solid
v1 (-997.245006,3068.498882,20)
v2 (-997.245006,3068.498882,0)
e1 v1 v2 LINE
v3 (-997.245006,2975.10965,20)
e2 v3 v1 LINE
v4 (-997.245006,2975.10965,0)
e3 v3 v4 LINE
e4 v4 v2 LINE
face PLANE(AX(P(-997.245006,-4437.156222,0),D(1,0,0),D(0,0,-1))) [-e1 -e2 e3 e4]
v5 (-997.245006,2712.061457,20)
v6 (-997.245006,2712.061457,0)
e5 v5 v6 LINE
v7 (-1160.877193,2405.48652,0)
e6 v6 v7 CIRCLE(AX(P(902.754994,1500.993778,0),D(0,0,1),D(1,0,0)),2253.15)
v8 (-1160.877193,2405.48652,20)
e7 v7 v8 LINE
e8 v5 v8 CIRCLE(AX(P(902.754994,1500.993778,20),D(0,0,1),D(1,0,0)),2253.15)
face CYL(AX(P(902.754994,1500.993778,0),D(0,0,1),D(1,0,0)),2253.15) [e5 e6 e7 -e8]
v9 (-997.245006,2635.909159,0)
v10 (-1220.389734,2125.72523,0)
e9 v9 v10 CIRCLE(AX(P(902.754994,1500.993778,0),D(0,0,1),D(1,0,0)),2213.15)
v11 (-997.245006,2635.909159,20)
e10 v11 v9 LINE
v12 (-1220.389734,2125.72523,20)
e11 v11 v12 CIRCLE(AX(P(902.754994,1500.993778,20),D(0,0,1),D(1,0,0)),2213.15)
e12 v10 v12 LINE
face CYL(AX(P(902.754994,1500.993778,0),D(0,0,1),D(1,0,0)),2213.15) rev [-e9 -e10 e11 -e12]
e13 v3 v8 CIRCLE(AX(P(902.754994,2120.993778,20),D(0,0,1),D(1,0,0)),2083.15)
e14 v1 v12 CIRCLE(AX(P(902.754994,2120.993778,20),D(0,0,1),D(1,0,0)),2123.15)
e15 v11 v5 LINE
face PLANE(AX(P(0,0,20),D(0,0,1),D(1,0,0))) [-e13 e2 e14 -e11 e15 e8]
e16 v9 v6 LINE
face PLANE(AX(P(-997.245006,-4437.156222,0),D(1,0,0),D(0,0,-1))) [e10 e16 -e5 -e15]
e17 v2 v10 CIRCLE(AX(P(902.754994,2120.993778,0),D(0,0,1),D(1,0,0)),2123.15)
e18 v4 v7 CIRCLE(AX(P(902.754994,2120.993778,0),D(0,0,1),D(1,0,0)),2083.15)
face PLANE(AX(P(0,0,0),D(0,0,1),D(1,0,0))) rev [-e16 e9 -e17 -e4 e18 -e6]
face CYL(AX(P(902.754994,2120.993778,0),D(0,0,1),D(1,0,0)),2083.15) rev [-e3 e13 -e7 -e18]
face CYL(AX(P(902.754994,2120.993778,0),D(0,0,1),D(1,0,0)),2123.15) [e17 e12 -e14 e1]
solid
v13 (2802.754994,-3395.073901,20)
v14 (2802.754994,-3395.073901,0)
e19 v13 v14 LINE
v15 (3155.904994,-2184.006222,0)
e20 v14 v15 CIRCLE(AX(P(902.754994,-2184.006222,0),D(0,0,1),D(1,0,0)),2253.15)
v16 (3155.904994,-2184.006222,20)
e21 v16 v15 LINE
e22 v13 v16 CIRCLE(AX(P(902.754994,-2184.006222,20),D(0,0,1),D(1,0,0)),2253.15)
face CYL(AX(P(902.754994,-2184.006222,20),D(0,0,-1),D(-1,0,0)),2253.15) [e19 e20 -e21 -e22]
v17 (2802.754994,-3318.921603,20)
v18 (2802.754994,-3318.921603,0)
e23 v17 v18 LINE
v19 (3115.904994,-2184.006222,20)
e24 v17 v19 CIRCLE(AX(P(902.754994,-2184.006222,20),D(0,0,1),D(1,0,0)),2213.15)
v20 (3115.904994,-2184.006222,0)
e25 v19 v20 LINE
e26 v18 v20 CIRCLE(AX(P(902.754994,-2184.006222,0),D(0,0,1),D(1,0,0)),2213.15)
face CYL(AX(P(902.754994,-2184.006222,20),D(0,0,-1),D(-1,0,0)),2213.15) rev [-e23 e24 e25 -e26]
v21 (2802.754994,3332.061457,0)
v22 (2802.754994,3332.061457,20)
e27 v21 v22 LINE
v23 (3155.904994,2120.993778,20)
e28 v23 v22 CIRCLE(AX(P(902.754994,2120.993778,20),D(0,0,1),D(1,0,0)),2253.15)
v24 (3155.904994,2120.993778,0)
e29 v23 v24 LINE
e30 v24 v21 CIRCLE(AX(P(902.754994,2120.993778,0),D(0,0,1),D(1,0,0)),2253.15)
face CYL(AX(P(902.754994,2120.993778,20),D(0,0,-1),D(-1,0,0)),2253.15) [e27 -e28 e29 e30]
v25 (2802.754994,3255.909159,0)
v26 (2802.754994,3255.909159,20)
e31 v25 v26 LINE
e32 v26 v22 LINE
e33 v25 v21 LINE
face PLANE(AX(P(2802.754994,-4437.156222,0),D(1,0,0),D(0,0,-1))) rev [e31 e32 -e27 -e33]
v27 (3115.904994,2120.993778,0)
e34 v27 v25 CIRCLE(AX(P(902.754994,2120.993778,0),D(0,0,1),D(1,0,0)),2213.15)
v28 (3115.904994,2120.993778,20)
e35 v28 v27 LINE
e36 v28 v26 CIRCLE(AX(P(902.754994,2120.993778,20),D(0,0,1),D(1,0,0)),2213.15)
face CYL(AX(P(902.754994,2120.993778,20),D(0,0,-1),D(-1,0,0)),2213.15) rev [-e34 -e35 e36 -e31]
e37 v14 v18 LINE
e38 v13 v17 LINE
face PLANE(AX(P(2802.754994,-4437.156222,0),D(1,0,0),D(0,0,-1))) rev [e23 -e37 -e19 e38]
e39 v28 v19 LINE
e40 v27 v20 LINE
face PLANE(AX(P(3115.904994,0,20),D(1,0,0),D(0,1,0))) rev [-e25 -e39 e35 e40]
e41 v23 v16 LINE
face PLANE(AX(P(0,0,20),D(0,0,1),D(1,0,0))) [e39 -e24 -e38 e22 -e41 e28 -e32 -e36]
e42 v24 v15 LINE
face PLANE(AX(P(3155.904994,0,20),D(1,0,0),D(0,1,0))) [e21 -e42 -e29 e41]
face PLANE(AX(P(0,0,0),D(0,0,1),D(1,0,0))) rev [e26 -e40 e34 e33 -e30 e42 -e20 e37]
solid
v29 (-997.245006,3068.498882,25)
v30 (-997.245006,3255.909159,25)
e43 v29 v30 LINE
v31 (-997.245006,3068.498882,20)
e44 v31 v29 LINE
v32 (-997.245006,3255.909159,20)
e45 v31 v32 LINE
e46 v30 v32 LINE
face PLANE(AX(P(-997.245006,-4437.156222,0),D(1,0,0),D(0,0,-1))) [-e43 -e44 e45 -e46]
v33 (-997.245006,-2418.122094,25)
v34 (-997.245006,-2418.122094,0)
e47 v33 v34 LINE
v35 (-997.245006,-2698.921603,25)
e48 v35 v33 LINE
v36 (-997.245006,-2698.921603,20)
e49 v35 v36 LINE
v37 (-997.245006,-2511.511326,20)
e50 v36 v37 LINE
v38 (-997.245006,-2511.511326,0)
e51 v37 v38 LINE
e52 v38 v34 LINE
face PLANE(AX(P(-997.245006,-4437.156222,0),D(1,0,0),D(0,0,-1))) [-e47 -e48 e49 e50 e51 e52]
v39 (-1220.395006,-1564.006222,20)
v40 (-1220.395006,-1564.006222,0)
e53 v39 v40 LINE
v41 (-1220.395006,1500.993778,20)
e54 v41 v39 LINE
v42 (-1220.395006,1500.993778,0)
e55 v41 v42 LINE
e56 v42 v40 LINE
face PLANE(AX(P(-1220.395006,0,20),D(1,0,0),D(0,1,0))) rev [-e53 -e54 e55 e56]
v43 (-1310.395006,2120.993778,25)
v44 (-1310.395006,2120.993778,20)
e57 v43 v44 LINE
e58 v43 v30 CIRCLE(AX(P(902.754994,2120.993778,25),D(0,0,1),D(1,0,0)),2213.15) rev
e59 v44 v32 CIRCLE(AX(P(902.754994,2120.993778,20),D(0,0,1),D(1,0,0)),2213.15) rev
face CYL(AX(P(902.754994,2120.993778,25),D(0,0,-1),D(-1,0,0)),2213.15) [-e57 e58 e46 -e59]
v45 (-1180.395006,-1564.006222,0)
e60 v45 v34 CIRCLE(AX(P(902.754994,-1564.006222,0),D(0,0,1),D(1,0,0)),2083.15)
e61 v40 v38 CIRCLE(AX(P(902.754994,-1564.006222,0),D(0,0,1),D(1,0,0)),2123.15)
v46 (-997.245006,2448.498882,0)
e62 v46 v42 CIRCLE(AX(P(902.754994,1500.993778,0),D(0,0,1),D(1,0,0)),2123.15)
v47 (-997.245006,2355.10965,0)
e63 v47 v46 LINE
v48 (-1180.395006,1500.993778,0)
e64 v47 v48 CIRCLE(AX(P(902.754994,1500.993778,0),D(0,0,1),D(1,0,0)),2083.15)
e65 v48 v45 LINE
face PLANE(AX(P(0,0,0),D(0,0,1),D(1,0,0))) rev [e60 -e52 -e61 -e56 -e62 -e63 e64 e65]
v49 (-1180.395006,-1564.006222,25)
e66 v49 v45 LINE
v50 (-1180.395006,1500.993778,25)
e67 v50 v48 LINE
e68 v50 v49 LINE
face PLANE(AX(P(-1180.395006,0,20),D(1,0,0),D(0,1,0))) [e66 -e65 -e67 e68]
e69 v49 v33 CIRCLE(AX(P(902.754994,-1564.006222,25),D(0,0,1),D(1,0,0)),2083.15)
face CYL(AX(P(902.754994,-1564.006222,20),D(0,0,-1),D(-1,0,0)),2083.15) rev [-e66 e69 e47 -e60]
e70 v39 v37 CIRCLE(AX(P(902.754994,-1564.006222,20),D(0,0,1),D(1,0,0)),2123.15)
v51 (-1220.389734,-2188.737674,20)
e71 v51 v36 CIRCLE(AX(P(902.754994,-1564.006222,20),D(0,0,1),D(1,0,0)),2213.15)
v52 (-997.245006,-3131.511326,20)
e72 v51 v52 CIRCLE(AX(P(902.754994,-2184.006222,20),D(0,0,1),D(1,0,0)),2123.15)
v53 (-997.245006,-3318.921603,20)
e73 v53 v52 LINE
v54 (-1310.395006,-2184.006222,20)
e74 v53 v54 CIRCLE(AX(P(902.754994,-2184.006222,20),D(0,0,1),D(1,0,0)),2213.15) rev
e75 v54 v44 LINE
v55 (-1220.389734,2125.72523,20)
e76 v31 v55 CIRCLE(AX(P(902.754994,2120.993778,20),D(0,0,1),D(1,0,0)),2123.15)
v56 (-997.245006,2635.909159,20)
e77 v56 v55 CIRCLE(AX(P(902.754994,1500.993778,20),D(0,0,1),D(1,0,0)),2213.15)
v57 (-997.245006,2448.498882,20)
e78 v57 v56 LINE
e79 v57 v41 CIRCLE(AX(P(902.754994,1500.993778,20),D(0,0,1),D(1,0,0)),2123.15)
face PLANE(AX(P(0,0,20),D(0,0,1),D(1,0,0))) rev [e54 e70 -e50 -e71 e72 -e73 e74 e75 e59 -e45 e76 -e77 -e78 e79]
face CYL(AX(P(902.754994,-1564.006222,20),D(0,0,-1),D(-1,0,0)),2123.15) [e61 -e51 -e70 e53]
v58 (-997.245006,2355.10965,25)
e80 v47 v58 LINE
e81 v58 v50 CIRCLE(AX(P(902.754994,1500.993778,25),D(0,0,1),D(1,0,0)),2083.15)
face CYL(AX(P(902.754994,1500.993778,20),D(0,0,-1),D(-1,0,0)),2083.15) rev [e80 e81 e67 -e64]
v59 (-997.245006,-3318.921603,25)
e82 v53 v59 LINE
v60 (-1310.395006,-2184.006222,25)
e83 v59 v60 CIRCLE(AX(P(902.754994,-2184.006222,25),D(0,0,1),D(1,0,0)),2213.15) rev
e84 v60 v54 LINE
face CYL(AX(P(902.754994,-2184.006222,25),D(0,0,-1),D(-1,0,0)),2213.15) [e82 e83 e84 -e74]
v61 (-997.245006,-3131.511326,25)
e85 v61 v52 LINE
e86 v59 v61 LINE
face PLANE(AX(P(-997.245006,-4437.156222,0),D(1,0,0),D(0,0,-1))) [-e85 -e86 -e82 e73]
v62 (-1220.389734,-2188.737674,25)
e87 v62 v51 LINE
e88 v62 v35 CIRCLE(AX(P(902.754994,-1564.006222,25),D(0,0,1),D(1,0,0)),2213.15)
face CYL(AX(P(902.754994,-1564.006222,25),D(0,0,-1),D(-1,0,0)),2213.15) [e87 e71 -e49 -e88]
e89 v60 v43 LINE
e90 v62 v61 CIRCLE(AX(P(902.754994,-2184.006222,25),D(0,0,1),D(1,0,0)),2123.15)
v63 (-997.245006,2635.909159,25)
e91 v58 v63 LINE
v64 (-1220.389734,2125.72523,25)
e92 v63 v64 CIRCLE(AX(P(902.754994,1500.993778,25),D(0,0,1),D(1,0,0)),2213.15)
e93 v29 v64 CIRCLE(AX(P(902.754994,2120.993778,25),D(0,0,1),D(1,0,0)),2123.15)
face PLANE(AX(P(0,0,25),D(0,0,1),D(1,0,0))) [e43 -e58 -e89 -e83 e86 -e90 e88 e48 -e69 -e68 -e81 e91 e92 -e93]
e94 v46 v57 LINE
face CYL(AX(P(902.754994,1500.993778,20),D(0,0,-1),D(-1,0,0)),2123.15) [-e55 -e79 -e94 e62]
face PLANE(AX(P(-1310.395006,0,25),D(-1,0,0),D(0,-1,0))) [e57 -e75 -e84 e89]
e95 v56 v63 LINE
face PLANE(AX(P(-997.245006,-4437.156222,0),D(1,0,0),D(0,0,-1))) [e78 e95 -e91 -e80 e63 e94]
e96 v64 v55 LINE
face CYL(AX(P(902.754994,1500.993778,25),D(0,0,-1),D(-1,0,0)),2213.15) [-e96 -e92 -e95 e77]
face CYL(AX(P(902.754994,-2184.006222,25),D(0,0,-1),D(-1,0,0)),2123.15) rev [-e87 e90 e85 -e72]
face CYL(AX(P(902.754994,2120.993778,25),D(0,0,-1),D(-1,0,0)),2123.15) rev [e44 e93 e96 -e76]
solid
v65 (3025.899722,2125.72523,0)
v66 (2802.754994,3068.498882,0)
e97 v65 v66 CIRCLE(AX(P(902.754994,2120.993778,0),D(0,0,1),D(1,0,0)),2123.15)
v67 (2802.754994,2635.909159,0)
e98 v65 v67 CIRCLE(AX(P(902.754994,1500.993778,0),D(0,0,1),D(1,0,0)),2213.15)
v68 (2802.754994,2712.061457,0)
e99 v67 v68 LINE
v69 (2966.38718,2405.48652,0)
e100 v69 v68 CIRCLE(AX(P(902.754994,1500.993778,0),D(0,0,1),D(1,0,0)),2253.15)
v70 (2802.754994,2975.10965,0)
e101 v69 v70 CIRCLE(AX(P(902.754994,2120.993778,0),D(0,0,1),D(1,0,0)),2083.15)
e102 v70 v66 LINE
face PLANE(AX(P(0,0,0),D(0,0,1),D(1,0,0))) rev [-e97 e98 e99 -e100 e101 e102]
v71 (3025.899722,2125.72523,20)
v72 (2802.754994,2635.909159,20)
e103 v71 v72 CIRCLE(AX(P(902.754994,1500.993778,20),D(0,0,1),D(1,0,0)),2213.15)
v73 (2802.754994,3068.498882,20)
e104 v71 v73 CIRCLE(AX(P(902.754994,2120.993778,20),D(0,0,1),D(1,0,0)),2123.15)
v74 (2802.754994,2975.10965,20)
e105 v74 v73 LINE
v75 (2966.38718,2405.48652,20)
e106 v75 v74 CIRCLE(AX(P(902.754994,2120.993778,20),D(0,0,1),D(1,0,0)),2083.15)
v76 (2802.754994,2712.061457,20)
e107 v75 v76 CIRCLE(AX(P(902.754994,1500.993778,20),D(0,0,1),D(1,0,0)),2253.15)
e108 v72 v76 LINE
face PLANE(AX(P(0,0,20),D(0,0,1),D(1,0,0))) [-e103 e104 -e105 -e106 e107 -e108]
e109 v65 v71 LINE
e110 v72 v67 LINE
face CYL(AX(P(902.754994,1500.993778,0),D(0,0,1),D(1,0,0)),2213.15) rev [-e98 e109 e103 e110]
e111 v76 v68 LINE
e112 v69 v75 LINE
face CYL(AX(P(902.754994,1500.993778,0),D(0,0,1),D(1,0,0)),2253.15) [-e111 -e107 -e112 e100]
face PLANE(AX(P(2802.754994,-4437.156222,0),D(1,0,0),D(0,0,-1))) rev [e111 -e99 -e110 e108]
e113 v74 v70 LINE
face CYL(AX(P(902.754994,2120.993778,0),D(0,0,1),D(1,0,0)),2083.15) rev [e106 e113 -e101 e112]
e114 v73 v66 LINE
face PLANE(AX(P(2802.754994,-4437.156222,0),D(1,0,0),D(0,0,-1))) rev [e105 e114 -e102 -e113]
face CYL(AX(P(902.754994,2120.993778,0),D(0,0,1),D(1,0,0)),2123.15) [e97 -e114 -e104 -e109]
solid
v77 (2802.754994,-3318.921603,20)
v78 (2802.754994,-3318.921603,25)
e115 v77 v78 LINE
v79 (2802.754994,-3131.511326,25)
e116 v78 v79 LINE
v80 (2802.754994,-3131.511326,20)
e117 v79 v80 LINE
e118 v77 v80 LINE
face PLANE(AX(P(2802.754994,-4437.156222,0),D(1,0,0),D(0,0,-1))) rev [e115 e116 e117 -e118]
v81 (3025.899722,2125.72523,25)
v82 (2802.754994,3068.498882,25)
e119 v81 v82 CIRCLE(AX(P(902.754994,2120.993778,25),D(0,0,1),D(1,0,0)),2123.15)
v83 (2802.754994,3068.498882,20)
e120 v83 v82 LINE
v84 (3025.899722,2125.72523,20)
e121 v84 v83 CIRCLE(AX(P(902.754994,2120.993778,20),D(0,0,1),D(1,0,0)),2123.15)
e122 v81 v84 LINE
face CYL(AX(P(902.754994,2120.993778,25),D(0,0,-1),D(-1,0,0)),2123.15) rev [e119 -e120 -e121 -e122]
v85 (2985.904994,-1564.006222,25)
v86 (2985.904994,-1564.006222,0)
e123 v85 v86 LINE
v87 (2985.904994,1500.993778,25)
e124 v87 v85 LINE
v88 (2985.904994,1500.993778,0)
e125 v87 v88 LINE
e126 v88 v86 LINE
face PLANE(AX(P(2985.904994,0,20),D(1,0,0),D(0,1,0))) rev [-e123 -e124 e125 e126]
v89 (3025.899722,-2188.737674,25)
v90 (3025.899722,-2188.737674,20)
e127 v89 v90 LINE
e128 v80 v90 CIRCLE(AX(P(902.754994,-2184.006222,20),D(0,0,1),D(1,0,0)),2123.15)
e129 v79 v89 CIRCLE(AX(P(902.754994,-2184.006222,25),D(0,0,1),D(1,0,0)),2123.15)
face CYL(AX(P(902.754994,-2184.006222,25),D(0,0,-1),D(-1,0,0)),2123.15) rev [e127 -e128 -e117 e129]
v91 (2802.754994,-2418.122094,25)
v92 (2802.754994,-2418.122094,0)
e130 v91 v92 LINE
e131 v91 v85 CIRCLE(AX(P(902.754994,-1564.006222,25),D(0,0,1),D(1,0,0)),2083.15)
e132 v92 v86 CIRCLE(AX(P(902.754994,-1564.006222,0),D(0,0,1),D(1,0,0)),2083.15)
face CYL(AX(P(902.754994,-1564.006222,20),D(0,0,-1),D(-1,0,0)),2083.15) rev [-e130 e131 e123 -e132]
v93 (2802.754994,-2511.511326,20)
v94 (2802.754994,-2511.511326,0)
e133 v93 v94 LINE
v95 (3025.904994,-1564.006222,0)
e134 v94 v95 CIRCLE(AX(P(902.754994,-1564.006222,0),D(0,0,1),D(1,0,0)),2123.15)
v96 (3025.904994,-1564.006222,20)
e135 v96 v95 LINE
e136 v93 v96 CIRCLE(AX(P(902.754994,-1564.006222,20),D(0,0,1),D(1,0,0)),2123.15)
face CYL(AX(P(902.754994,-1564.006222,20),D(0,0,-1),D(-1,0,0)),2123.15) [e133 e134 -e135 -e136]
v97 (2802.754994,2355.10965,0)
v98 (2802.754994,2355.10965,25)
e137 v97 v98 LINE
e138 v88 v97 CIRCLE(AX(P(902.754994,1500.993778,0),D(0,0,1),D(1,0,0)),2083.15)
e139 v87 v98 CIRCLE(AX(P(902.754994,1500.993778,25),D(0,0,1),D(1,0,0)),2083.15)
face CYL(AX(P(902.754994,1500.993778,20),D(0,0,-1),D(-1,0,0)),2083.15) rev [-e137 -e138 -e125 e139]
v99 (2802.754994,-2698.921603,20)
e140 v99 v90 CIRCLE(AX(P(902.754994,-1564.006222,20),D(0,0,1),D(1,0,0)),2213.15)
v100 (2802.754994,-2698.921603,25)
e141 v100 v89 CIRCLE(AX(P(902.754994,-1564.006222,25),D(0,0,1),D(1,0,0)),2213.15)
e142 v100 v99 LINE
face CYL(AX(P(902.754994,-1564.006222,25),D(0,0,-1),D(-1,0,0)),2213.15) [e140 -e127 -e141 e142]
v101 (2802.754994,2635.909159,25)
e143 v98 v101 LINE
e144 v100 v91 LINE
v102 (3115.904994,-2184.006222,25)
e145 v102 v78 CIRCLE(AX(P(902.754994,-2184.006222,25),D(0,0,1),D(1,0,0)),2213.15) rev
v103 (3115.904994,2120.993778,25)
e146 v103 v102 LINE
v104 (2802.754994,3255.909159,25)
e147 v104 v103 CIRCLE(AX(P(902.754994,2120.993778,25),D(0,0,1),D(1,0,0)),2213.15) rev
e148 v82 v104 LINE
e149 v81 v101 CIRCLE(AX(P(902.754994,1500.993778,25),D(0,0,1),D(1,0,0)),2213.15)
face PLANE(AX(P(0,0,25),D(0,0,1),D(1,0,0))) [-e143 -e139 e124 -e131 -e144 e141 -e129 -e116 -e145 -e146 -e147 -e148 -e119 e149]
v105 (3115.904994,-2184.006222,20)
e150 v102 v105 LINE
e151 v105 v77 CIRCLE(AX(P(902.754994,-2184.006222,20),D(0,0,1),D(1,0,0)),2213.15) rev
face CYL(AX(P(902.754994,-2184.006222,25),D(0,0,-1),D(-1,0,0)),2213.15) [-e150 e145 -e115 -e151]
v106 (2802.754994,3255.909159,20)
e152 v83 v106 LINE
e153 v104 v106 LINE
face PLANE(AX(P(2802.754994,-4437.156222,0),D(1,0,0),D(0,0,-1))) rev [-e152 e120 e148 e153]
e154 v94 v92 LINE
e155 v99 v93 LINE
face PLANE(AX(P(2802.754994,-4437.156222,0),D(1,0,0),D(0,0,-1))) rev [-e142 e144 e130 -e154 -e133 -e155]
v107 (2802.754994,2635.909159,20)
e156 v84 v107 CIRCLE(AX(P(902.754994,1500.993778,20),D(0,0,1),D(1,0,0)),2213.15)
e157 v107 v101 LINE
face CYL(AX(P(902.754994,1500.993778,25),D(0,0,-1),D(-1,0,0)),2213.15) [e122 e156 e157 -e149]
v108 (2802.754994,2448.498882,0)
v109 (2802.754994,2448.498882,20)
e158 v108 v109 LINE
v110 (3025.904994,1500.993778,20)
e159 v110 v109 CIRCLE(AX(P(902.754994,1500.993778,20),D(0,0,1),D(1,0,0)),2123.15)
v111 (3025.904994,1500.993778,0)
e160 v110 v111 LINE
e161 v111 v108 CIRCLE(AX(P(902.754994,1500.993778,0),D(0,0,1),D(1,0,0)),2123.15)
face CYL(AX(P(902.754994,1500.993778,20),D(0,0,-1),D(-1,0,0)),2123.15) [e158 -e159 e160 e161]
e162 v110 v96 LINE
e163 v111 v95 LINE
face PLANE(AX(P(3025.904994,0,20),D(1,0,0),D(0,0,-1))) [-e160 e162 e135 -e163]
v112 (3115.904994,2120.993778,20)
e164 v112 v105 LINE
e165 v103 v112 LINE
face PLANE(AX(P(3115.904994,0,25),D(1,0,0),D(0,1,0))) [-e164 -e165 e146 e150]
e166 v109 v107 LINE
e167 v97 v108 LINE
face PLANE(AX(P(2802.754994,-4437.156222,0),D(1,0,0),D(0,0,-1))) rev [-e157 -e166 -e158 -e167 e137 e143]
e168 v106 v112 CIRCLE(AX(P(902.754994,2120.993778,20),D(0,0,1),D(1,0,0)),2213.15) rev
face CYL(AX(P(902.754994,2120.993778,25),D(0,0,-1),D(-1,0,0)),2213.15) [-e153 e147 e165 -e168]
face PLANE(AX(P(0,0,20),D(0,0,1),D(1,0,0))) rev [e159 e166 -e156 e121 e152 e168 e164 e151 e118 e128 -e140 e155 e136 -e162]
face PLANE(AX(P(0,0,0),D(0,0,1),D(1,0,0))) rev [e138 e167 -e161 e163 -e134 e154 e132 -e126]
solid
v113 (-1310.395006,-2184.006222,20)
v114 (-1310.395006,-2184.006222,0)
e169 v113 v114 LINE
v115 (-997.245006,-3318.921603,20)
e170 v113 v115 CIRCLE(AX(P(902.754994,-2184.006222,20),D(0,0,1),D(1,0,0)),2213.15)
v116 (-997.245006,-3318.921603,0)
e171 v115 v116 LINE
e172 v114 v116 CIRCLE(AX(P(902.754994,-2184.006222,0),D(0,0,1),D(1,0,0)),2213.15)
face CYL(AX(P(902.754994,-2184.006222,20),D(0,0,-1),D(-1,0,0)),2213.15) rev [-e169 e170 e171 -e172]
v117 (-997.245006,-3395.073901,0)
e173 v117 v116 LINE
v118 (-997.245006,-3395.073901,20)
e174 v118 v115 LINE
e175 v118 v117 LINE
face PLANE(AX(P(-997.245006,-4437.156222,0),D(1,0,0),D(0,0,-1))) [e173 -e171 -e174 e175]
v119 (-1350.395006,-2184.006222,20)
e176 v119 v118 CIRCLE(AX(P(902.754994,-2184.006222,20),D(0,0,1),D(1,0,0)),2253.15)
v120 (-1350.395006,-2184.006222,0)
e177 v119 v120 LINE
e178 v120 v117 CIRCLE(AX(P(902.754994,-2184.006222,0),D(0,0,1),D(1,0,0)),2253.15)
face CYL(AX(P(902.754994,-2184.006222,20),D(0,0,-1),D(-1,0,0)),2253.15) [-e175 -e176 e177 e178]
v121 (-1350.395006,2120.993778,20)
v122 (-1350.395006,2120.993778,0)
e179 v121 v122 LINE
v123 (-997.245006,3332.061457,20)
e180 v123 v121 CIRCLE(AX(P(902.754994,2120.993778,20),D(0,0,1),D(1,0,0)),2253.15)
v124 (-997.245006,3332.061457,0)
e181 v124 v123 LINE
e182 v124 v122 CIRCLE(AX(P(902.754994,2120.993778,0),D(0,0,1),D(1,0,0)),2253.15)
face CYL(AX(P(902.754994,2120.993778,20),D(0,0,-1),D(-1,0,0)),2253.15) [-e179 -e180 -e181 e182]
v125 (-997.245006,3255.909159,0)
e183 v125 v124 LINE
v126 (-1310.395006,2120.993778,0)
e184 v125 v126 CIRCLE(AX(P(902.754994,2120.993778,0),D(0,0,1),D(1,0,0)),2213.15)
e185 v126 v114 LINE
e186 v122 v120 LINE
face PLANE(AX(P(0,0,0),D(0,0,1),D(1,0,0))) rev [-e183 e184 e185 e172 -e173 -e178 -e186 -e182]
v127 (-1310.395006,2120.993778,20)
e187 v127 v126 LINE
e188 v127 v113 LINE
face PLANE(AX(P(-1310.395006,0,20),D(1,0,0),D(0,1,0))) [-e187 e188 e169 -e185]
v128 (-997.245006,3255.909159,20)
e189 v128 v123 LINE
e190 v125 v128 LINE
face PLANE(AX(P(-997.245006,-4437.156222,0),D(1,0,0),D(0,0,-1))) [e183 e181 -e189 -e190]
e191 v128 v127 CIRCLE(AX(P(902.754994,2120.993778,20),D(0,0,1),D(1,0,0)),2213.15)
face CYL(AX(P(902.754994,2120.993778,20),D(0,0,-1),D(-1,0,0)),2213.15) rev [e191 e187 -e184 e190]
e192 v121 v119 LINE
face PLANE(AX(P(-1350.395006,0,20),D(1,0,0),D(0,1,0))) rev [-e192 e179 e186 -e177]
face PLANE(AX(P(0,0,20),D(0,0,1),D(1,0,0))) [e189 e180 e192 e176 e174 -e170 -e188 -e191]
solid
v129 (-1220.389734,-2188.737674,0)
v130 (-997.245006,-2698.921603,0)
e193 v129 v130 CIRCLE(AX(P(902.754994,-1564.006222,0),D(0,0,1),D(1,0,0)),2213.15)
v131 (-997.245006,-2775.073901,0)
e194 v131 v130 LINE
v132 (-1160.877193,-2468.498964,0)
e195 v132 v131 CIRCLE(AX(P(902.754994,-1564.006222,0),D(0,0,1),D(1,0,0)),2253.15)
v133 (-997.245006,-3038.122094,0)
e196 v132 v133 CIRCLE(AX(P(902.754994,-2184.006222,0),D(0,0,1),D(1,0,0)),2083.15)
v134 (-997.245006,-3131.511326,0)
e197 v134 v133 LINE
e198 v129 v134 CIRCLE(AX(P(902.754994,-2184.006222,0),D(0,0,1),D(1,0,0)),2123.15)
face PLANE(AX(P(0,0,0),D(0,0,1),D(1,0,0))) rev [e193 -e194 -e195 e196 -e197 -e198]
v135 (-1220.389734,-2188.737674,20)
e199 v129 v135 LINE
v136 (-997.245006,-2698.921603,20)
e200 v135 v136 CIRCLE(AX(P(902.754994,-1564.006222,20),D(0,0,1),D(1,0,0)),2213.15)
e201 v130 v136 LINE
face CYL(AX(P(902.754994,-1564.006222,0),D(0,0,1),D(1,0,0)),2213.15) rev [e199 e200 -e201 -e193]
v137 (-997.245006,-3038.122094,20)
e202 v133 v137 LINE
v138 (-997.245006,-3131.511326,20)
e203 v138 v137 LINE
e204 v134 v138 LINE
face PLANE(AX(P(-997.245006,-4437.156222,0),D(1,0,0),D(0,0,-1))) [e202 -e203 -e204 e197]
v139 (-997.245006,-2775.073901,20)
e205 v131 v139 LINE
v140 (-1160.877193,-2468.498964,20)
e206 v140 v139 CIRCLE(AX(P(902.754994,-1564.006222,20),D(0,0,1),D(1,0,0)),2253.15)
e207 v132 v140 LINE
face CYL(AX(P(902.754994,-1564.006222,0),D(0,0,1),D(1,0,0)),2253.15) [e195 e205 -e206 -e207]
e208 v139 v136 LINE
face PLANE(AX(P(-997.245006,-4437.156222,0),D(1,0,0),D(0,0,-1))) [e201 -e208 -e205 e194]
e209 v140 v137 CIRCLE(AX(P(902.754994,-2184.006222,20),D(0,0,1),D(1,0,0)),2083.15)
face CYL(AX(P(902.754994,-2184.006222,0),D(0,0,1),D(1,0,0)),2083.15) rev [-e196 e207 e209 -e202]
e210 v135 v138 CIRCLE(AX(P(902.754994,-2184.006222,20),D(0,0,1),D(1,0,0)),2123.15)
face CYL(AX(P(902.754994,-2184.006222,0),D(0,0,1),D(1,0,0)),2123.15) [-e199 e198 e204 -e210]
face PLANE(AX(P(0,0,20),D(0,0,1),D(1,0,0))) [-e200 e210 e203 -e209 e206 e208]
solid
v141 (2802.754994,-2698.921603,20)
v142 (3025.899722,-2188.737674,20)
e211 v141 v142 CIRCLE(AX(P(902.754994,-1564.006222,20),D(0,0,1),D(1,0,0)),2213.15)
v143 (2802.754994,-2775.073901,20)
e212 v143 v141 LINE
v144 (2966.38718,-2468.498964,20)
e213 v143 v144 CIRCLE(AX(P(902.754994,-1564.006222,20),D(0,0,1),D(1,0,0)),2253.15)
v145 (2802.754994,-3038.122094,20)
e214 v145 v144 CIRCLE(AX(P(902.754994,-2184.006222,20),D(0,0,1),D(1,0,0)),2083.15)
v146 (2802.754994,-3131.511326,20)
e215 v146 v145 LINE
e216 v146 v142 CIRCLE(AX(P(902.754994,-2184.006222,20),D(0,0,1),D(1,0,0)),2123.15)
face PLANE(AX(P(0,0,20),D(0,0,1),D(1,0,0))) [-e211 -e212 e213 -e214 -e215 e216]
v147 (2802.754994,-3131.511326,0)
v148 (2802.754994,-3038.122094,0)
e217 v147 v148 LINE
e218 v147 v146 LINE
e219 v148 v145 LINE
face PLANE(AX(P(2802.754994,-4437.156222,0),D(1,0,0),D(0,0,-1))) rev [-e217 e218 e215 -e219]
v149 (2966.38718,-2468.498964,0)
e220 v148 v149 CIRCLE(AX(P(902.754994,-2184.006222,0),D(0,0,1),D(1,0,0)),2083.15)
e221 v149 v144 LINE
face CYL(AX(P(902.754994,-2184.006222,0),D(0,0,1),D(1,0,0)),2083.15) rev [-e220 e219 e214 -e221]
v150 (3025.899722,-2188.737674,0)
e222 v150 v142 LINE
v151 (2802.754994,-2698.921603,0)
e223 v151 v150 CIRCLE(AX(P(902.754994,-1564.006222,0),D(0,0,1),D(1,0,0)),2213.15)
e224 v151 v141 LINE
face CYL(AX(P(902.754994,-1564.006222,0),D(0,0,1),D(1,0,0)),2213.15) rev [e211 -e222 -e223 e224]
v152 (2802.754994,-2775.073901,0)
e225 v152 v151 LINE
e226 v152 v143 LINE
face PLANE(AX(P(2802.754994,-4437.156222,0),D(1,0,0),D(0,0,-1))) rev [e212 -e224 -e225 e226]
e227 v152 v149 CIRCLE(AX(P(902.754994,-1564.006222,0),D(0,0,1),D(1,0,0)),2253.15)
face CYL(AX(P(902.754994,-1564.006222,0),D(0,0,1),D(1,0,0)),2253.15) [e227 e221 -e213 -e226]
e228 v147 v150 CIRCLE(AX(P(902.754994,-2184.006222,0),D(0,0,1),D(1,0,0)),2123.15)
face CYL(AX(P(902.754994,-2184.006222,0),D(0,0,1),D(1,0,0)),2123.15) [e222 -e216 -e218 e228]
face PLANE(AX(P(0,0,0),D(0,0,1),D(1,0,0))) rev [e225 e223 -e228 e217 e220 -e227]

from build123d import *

# Parameters (mm, degrees)
BOSS_EXTRUDE1_DEPTH   = 20
BOSS_EXTRUDE1_2_DEPTH = 20
BOSS_EXTRUDE2_DEPTH   = 20
BOSS_EXTRUDE2_2_DEPTH = 20
BOSS_EXTRUDE3_DEPTH   = 5
SKETCH5_W             = 3800
SKETCH5_H             = 576.541900626
CUT_EXTRUDE1_DEPTH    = 9360.453457287


with BuildPart() as part:
    # Sketch1 → Boss-Extrude1 (new body)
    with BuildSketch(Plane.XY):
        with BuildLine():
            ThreePointArc((3025.904993677, 1500.993778109), (902.754993677, 3624.143778109), (-1220.395006323, 1500.993778109))
            Line((-1220.395006323, 1500.993778109), (-1220.395006323, -1564.006221891))
            ThreePointArc((-1220.395006323, -1564.006221891), (902.754993677, -3687.156221891), (3025.904993677, -1564.006221891))
            Line((3025.904993677, -1564.006221891), (3025.904993677, 1500.993778109))
        make_face()
        with BuildLine():
            Line((-1180.395006323, -1564.006221891), (-1180.395006323, 1500.993778109))
            ThreePointArc((-1180.395006323, 1500.993778109), (902.754993677, 3584.143778109), (2985.904993677, 1500.993778109))
            Line((2985.904993677, 1500.993778109), (2985.904993677, -1564.006221891))
            ThreePointArc((2985.904993677, -1564.006221891), (902.754993677, -3647.156221891), (-1180.395006323, -1564.006221891))
        make_face(mode=Mode.SUBTRACT)
    extrude(amount=BOSS_EXTRUDE1_DEPTH)

    # Sketch3 → Boss-Extrude3 (add)
    with BuildSketch(Plane.XY.offset(20)):
        with BuildLine():
            ThreePointArc((-1310.395006323, -2184.006221891), (902.754993677, -4397.156221891), (3115.904993677, -2184.006221891))
            Line((3115.904993677, -2184.006221891), (3115.904993677, 2120.993778109))
            ThreePointArc((3115.904993677, 2120.993778109), (902.754993677, 4334.143778109), (-1310.395006323, 2120.993778109))
            Line((-1310.395006323, 2120.993778109), (-1310.395006323, -2184.006221891))
        make_face()
        with BuildLine():
            ThreePointArc((3025.899721638, -2188.737673504), (902.754993677, -4307.156221891), (-1220.389734283, -2188.737673504))
            ThreePointArc((-1220.389734283, -2188.737673504), (902.754993677, -3777.156221891), (3025.899721638, -2188.737673504))
        make_face(mode=Mode.SUBTRACT)
        with BuildLine():
            ThreePointArc((-1180.395006323, 1500.993778109), (902.754993677, 3584.143778109), (2985.904993677, 1500.993778109))
            Line((2985.904993677, 1500.993778109), (2985.904993677, -1564.006221891))
            ThreePointArc((2985.904993677, -1564.006221891), (902.754993677, -3647.156221891), (-1180.395006323, -1564.006221891))
            Line((-1180.395006323, -1564.006221891), (-1180.395006323, 1500.993778109))
        make_face(mode=Mode.SUBTRACT)
        with BuildLine():
            ThreePointArc((-1220.389734283, 2125.725229722), (902.754993677, 4244.143778109), (3025.899721638, 2125.725229722))
            ThreePointArc((3025.899721638, 2125.725229722), (902.754993677, 3714.143778109), (-1220.389734283, 2125.725229722))
        make_face(mode=Mode.SUBTRACT)
    extrude(amount=BOSS_EXTRUDE3_DEPTH)


with BuildPart() as body_2:
    # Sketch1 → Boss-Extrude1 2 (new body)
    with BuildSketch(Plane.XY):
        with BuildLine():
            ThreePointArc((3155.904993677, 2120.993778109), (902.754993677, 4374.143778109), (-1350.395006323, 2120.993778109))
            Line((-1350.395006323, 2120.993778109), (-1350.395006323, -2184.006221891))
            ThreePointArc((-1350.395006323, -2184.006221891), (902.754993677, -4437.156221891), (3155.904993677, -2184.006221891))
            Line((3155.904993677, -2184.006221891), (3155.904993677, 2120.993778109))
        make_face()
        with BuildLine():
            Line((-1310.395006323, -2184.006221891), (-1310.395006323, 2120.993778109))
            ThreePointArc((-1310.395006323, 2120.993778109), (902.754993677, 4334.143778109), (3115.904993677, 2120.993778109))
            Line((3115.904993677, 2120.993778109), (3115.904993677, -2184.006221891))
            ThreePointArc((3115.904993677, -2184.006221891), (902.754993677, -4397.156221891), (-1310.395006323, -2184.006221891))
        make_face(mode=Mode.SUBTRACT)
    extrude(amount=BOSS_EXTRUDE1_2_DEPTH)


with BuildPart() as body_3:
    # Sketch2 → Boss-Extrude2 (new body)
    with BuildSketch(Plane.XY.offset(20)):
        with BuildLine():
            ThreePointArc((3025.899721638, 2125.725229722), (902.754993677, 4244.143778109), (-1220.389734283, 2125.725229722))
            ThreePointArc((-1220.389734283, 2125.725229722), (902.754993677, 3714.143778109), (3025.899721638, 2125.725229722))
        make_face()
        with BuildLine():
            ThreePointArc((-1160.877193096, 2405.486520044), (902.754993677, 4204.143778109), (2966.387180451, 2405.486520044))
            ThreePointArc((2966.387180451, 2405.486520044), (902.754993677, 3754.143778109), (-1160.877193096, 2405.486520044))
        make_face(mode=Mode.SUBTRACT)
    extrude(amount=-BOSS_EXTRUDE2_DEPTH)


with BuildPart() as body_4:
    # Sketch2 → Boss-Extrude2 2 (new body)
    with BuildSketch(Plane.XY.offset(20)):
        with BuildLine():
            ThreePointArc((-1220.389734283, -2188.737673504), (902.754993677, -4307.156221891), (3025.899721638, -2188.737673504))
            ThreePointArc((3025.899721638, -2188.737673504), (902.754993677, -3777.156221891), (-1220.389734283, -2188.737673504))
        make_face()
        with BuildLine():
            ThreePointArc((2966.387180451, -2468.498963827), (902.754993677, -4267.156221891), (-1160.877193096, -2468.498963827))
            ThreePointArc((-1160.877193096, -2468.498963827), (902.754993677, -3817.156221891), (2966.387180451, -2468.498963827))
        make_face(mode=Mode.SUBTRACT)
    extrude(amount=-BOSS_EXTRUDE2_2_DEPTH)


with BuildPart() as cut_extrude1_tool:
    # Sketch5 → Cut-Extrude1 (new, through all)
    with BuildSketch(Plane(origin=(0, 4374.143778109, 0), x_dir=(1, 0, 0), z_dir=(0, 1, 0))):
        with Locations((902.754993677, -10)):
            Rectangle(SKETCH5_W, SKETCH5_H)
    extrude(amount=-CUT_EXTRUDE1_DEPTH)


with BuildPart() as part_1:
    add(part.part)

    # Cut-Extrude1: cut by cut_extrude1_tool
    add(cut_extrude1_tool.part, mode=Mode.SUBTRACT)


with BuildPart() as body_2_1:
    add(body_2.part)

    # Cut-Extrude1: cut by cut_extrude1_tool
    add(cut_extrude1_tool.part, mode=Mode.SUBTRACT)


with BuildPart() as body_3_1:
    add(body_3.part)

    # Cut-Extrude1: cut by cut_extrude1_tool
    add(cut_extrude1_tool.part, mode=Mode.SUBTRACT)


with BuildPart() as body_4_1:
    add(body_4.part)

    # Cut-Extrude1: cut by cut_extrude1_tool
    add(cut_extrude1_tool.part, mode=Mode.SUBTRACT)


with BuildPart() as cut_extrude1_piece_1:
    # of the separate pieces the step leaves, piece 1, a body of its own (cut_extrude1_pieces)
    add(part_1.part.solids().sort_by_distance((-997.245006323, 2448.498882317, 0))[0])


with BuildPart() as cut_extrude1_piece_2:
    # of the separate pieces the step leaves, piece 2, a body of its own (cut_extrude1_pieces)
    add(part_1.part.solids().sort_by_distance((3025.904993677, 1500.993778109, 0))[0])


with BuildPart() as cut_extrude1_piece_1_of_body_2:
    # of the separate pieces the step leaves, piece 1, a body of its own (cut_extrude1_pieces_of_body_2)
    add(body_2_1.part.solids().sort_by_distance((2802.754993677, -3395.073900636, 0))[0])


with BuildPart() as cut_extrude1_piece_2_of_body_2:
    # of the separate pieces the step leaves, piece 2, a body of its own (cut_extrude1_pieces_of_body_2)
    add(body_2_1.part.solids().sort_by_distance((-1350.395006323, -2184.006221891, 0))[0])


with BuildPart() as cut_extrude1_piece_1_of_body_3:
    # of the separate pieces the step leaves, piece 1, a body of its own (cut_extrude1_pieces_of_body_3)
    add(body_3_1.part.solids().sort_by_distance((2802.754993677, 2635.909159316, 20))[0])


with BuildPart() as cut_extrude1_piece_2_of_body_3:
    # of the separate pieces the step leaves, piece 2, a body of its own (cut_extrude1_pieces_of_body_3)
    add(body_3_1.part.solids().sort_by_distance((-1220.389734283, 2125.725229722, 20))[0])


with BuildPart() as cut_extrude1_piece_1_of_body_4:
    # of the separate pieces the step leaves, piece 1, a body of its own (cut_extrude1_pieces_of_body_4)
    add(body_4_1.part.solids().sort_by_distance((-997.245006323, -2698.921603098, 20))[0])


with BuildPart() as cut_extrude1_piece_2_of_body_4:
    # of the separate pieces the step leaves, piece 2, a body of its own (cut_extrude1_pieces_of_body_4)
    add(body_4_1.part.solids().sort_by_distance((3025.899721638, -2188.737673504, 20))[0])


solid = Compound([cut_extrude1_piece_1.part, cut_extrude1_piece_2.part, cut_extrude1_piece_1_of_body_2.part, cut_extrude1_piece_2_of_body_2.part, cut_extrude1_piece_1_of_body_3.part, cut_extrude1_piece_2_of_body_3.part, cut_extrude1_piece_1_of_body_4.part, cut_extrude1_piece_2_of_body_4.part])
